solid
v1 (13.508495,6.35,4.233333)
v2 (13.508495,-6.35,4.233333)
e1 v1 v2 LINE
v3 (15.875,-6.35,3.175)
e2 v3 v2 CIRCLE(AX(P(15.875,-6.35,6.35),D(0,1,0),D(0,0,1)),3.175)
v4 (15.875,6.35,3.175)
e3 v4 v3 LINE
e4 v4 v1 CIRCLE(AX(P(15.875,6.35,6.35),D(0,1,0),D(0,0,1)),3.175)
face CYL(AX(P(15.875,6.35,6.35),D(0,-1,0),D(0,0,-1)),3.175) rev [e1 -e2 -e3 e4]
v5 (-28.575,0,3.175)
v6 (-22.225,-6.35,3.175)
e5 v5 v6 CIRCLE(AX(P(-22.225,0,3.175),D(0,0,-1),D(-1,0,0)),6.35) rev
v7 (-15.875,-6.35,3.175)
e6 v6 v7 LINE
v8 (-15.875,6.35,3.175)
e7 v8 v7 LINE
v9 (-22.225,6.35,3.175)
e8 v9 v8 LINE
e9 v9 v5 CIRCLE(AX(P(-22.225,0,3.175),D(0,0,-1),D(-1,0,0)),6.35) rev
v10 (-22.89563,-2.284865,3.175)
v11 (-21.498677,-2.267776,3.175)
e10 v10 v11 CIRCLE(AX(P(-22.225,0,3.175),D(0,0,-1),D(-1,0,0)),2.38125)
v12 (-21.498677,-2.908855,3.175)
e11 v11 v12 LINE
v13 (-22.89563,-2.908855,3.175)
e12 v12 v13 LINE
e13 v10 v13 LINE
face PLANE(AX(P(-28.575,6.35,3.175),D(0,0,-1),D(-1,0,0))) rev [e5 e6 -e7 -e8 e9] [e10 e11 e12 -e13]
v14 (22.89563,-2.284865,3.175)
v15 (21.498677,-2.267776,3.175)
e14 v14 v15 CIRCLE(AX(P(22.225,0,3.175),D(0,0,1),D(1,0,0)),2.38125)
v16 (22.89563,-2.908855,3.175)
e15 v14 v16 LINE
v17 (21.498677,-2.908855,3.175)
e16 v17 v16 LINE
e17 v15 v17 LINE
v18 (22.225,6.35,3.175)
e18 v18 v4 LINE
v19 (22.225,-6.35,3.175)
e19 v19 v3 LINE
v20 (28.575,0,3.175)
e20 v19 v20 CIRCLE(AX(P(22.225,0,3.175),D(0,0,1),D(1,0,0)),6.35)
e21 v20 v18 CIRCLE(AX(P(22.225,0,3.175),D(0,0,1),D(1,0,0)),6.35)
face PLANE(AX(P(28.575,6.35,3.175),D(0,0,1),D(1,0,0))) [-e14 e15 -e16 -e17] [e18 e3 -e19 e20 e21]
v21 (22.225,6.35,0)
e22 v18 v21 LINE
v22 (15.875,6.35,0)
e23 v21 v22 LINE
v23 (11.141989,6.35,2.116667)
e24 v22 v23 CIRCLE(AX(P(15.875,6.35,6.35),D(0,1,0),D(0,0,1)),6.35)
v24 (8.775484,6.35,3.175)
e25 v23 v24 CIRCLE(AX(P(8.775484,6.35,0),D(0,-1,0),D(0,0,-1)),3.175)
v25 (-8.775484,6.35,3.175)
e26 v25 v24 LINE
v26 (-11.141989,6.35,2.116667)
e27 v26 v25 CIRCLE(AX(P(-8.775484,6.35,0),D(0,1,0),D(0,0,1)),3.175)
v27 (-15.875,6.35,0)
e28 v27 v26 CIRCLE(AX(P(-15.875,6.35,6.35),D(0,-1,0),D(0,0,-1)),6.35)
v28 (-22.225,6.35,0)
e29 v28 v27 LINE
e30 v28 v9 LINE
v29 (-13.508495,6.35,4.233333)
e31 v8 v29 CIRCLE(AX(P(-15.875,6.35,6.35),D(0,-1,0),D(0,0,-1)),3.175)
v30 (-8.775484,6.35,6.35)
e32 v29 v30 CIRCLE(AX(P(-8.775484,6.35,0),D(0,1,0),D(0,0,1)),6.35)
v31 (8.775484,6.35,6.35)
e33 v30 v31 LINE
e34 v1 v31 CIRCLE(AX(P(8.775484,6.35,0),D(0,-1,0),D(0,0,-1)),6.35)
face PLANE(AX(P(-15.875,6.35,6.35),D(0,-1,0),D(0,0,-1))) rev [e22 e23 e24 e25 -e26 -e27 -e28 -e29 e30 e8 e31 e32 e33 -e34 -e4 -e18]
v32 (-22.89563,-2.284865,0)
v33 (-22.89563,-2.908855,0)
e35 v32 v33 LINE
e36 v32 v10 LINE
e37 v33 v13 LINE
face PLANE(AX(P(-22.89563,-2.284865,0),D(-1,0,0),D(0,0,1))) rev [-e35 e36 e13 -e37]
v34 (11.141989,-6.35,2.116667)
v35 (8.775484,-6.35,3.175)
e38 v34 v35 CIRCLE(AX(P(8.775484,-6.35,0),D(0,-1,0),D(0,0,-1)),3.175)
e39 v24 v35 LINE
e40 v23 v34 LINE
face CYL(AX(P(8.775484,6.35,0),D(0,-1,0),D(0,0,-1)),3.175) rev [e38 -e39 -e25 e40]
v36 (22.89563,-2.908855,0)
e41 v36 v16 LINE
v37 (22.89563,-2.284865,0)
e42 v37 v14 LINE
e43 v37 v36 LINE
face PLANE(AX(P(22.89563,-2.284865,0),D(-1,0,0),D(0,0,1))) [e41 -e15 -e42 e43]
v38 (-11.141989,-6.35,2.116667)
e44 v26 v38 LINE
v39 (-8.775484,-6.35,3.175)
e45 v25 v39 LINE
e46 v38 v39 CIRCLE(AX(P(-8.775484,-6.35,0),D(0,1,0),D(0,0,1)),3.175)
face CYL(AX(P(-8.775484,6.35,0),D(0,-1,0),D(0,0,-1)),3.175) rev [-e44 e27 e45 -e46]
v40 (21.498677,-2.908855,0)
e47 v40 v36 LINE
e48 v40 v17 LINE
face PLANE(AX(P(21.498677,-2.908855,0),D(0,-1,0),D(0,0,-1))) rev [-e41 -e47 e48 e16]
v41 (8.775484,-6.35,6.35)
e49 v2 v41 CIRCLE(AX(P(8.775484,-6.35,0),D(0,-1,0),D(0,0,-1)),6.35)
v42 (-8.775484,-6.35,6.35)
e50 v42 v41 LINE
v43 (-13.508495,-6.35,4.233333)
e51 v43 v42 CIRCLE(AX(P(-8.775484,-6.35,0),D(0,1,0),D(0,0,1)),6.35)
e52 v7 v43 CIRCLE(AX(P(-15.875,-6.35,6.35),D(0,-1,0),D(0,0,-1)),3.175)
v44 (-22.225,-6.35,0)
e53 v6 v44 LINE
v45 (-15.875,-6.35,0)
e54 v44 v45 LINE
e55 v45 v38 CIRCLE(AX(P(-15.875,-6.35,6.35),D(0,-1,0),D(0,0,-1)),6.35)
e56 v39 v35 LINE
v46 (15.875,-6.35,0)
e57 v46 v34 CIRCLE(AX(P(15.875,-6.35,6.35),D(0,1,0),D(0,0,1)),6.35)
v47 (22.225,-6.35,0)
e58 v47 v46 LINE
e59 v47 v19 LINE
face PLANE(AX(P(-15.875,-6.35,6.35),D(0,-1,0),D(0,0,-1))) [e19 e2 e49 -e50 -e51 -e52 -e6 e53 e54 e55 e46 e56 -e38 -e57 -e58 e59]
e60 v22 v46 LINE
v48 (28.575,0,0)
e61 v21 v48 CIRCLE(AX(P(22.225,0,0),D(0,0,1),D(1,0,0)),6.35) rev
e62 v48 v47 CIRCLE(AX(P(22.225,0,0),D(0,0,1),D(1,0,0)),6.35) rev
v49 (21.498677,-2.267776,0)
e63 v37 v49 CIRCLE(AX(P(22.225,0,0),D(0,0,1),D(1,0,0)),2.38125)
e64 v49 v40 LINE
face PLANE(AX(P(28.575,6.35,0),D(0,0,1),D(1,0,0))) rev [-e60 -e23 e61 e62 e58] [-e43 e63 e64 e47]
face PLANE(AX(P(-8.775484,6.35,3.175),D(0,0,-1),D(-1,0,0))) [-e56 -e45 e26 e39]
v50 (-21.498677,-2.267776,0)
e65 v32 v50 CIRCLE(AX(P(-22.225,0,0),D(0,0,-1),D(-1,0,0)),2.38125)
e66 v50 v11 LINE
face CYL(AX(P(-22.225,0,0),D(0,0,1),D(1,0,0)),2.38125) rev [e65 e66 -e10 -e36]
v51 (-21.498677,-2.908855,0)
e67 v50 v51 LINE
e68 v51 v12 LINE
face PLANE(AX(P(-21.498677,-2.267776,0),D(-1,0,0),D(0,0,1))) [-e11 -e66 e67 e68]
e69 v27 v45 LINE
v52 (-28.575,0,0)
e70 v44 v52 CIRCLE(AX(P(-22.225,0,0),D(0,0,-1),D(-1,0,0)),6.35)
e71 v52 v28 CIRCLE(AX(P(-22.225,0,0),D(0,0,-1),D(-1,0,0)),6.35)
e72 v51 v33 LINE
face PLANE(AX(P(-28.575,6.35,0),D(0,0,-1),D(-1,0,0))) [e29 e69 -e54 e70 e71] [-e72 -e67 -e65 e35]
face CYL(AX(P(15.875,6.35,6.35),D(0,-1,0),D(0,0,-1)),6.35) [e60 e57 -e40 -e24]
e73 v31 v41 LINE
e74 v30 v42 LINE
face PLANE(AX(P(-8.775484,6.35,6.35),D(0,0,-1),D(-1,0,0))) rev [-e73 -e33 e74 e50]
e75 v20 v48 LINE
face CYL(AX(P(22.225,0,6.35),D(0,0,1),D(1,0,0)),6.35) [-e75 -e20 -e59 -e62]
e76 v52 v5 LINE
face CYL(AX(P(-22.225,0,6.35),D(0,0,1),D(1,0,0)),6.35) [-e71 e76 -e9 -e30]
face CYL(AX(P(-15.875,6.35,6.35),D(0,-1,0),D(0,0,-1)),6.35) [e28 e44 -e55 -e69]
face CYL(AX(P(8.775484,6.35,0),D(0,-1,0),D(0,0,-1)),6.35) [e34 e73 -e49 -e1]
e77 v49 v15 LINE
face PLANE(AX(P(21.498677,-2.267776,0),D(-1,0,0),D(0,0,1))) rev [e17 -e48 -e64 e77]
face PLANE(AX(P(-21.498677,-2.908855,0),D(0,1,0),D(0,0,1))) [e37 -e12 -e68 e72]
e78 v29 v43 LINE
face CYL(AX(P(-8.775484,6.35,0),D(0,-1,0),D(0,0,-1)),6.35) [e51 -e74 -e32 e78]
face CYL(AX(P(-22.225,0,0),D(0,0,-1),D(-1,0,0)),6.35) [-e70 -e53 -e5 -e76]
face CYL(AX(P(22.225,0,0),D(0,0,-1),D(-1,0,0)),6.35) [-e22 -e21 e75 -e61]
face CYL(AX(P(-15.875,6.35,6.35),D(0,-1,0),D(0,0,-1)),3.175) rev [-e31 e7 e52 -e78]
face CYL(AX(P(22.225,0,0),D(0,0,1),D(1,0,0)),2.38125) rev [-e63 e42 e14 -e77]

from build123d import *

# Parameters (mm, degrees)
BASE_EXTRUDE_DEPTH = 6.35
FILLET1_R          = 6.35
CUT_EXTRUDE1_DEPTH = 30.443738723


with BuildPart() as part:
    # Sketch1 → Base-Extrude (new, symmetric)
    with BuildSketch(Plane(origin=(0, 0, 0), x_dir=(1, 0, 0), z_dir=(0, 1, 0))):
        with BuildLine():
            Line((-28.575, 0), (-15.875, 0))
            ThreePointArc((-15.875, 0), (-13.282623356, -0.5532696), (-11.141989448, -2.116666667))
            ThreePointArc((-11.141989448, -2.116666667), (-10.071672494, -2.8983652), (-8.775484171, -3.175))
            Line((-8.775484171, -3.175), (8.775484171, -3.175))
            ThreePointArc((8.775484171, -3.175), (10.071672494, -2.8983652), (11.141989448, -2.116666667))
            ThreePointArc((11.141989448, -2.116666667), (13.282623356, -0.5532696), (15.875, 0))
            Line((15.875, 0), (28.575, 0))
            Line((28.575, 0), (28.575, -3.175))
            Line((28.575, -3.175), (15.875, -3.175))
            ThreePointArc((15.875, -3.175), (14.578811678, -3.4516348), (13.508494724, -4.233333333))
            ThreePointArc((13.508494724, -4.233333333), (11.367860816, -5.7967304), (8.775484171, -6.35))
            Line((8.775484171, -6.35), (-8.775484171, -6.35))
            ThreePointArc((-8.775484171, -6.35), (-11.367860816, -5.7967304), (-13.508494724, -4.233333333))
            ThreePointArc((-13.508494724, -4.233333333), (-14.578811678, -3.4516348), (-15.875, -3.175))
            Line((-15.875, -3.175), (-28.575, -3.175))
            Line((-28.575, -3.175), (-28.575, 0))
        make_face()
    extrude(amount=BASE_EXTRUDE_DEPTH, both=True)

    # Fillet1
    fillet1_edges = [part.edges().sort_by_distance(p)[0] for p in [
        (-28.575, 6.35, 1.5875),
        (28.575, 6.35, 1.5875),
        (28.575, -6.35, 1.5875),
        (-28.575, -6.35, 1.5875),
    ]]
    fillet(fillet1_edges, radius=FILLET1_R - 0.0001)  # a hair under: the kernel refuses the full size

    # Sketch2 → Cut-Extrude1 (cut, through all)
    with BuildSketch(Plane.XY.offset(3.175)):
        with BuildLine():
            Line((-22.895630041, -2.284864747), (-22.895630041, -2.908854561))
            Line((-22.895630041, -2.908854561), (-21.498676538, -2.908854561))
            Line((-21.498676538, -2.908854561), (-21.498676538, -2.267775516))
            ThreePointArc((-21.498676538, -2.267775516), (-22.254128161, 2.381071841), (-22.895630041, -2.284864747))
        make_face()
        with BuildLine():
            Line((21.498676538, -2.267775516), (21.498676538, -2.908854561))
            Line((21.498676538, -2.908854561), (22.895630041, -2.908854561))
            Line((22.895630041, -2.908854561), (22.895630041, -2.284864747))
            ThreePointArc((22.895630041, -2.284864747), (22.254128161, 2.381071841), (21.498676538, -2.267775516))
        make_face()
    extrude(amount=-CUT_EXTRUDE1_DEPTH, mode=Mode.SUBTRACT)


solid = part.part
